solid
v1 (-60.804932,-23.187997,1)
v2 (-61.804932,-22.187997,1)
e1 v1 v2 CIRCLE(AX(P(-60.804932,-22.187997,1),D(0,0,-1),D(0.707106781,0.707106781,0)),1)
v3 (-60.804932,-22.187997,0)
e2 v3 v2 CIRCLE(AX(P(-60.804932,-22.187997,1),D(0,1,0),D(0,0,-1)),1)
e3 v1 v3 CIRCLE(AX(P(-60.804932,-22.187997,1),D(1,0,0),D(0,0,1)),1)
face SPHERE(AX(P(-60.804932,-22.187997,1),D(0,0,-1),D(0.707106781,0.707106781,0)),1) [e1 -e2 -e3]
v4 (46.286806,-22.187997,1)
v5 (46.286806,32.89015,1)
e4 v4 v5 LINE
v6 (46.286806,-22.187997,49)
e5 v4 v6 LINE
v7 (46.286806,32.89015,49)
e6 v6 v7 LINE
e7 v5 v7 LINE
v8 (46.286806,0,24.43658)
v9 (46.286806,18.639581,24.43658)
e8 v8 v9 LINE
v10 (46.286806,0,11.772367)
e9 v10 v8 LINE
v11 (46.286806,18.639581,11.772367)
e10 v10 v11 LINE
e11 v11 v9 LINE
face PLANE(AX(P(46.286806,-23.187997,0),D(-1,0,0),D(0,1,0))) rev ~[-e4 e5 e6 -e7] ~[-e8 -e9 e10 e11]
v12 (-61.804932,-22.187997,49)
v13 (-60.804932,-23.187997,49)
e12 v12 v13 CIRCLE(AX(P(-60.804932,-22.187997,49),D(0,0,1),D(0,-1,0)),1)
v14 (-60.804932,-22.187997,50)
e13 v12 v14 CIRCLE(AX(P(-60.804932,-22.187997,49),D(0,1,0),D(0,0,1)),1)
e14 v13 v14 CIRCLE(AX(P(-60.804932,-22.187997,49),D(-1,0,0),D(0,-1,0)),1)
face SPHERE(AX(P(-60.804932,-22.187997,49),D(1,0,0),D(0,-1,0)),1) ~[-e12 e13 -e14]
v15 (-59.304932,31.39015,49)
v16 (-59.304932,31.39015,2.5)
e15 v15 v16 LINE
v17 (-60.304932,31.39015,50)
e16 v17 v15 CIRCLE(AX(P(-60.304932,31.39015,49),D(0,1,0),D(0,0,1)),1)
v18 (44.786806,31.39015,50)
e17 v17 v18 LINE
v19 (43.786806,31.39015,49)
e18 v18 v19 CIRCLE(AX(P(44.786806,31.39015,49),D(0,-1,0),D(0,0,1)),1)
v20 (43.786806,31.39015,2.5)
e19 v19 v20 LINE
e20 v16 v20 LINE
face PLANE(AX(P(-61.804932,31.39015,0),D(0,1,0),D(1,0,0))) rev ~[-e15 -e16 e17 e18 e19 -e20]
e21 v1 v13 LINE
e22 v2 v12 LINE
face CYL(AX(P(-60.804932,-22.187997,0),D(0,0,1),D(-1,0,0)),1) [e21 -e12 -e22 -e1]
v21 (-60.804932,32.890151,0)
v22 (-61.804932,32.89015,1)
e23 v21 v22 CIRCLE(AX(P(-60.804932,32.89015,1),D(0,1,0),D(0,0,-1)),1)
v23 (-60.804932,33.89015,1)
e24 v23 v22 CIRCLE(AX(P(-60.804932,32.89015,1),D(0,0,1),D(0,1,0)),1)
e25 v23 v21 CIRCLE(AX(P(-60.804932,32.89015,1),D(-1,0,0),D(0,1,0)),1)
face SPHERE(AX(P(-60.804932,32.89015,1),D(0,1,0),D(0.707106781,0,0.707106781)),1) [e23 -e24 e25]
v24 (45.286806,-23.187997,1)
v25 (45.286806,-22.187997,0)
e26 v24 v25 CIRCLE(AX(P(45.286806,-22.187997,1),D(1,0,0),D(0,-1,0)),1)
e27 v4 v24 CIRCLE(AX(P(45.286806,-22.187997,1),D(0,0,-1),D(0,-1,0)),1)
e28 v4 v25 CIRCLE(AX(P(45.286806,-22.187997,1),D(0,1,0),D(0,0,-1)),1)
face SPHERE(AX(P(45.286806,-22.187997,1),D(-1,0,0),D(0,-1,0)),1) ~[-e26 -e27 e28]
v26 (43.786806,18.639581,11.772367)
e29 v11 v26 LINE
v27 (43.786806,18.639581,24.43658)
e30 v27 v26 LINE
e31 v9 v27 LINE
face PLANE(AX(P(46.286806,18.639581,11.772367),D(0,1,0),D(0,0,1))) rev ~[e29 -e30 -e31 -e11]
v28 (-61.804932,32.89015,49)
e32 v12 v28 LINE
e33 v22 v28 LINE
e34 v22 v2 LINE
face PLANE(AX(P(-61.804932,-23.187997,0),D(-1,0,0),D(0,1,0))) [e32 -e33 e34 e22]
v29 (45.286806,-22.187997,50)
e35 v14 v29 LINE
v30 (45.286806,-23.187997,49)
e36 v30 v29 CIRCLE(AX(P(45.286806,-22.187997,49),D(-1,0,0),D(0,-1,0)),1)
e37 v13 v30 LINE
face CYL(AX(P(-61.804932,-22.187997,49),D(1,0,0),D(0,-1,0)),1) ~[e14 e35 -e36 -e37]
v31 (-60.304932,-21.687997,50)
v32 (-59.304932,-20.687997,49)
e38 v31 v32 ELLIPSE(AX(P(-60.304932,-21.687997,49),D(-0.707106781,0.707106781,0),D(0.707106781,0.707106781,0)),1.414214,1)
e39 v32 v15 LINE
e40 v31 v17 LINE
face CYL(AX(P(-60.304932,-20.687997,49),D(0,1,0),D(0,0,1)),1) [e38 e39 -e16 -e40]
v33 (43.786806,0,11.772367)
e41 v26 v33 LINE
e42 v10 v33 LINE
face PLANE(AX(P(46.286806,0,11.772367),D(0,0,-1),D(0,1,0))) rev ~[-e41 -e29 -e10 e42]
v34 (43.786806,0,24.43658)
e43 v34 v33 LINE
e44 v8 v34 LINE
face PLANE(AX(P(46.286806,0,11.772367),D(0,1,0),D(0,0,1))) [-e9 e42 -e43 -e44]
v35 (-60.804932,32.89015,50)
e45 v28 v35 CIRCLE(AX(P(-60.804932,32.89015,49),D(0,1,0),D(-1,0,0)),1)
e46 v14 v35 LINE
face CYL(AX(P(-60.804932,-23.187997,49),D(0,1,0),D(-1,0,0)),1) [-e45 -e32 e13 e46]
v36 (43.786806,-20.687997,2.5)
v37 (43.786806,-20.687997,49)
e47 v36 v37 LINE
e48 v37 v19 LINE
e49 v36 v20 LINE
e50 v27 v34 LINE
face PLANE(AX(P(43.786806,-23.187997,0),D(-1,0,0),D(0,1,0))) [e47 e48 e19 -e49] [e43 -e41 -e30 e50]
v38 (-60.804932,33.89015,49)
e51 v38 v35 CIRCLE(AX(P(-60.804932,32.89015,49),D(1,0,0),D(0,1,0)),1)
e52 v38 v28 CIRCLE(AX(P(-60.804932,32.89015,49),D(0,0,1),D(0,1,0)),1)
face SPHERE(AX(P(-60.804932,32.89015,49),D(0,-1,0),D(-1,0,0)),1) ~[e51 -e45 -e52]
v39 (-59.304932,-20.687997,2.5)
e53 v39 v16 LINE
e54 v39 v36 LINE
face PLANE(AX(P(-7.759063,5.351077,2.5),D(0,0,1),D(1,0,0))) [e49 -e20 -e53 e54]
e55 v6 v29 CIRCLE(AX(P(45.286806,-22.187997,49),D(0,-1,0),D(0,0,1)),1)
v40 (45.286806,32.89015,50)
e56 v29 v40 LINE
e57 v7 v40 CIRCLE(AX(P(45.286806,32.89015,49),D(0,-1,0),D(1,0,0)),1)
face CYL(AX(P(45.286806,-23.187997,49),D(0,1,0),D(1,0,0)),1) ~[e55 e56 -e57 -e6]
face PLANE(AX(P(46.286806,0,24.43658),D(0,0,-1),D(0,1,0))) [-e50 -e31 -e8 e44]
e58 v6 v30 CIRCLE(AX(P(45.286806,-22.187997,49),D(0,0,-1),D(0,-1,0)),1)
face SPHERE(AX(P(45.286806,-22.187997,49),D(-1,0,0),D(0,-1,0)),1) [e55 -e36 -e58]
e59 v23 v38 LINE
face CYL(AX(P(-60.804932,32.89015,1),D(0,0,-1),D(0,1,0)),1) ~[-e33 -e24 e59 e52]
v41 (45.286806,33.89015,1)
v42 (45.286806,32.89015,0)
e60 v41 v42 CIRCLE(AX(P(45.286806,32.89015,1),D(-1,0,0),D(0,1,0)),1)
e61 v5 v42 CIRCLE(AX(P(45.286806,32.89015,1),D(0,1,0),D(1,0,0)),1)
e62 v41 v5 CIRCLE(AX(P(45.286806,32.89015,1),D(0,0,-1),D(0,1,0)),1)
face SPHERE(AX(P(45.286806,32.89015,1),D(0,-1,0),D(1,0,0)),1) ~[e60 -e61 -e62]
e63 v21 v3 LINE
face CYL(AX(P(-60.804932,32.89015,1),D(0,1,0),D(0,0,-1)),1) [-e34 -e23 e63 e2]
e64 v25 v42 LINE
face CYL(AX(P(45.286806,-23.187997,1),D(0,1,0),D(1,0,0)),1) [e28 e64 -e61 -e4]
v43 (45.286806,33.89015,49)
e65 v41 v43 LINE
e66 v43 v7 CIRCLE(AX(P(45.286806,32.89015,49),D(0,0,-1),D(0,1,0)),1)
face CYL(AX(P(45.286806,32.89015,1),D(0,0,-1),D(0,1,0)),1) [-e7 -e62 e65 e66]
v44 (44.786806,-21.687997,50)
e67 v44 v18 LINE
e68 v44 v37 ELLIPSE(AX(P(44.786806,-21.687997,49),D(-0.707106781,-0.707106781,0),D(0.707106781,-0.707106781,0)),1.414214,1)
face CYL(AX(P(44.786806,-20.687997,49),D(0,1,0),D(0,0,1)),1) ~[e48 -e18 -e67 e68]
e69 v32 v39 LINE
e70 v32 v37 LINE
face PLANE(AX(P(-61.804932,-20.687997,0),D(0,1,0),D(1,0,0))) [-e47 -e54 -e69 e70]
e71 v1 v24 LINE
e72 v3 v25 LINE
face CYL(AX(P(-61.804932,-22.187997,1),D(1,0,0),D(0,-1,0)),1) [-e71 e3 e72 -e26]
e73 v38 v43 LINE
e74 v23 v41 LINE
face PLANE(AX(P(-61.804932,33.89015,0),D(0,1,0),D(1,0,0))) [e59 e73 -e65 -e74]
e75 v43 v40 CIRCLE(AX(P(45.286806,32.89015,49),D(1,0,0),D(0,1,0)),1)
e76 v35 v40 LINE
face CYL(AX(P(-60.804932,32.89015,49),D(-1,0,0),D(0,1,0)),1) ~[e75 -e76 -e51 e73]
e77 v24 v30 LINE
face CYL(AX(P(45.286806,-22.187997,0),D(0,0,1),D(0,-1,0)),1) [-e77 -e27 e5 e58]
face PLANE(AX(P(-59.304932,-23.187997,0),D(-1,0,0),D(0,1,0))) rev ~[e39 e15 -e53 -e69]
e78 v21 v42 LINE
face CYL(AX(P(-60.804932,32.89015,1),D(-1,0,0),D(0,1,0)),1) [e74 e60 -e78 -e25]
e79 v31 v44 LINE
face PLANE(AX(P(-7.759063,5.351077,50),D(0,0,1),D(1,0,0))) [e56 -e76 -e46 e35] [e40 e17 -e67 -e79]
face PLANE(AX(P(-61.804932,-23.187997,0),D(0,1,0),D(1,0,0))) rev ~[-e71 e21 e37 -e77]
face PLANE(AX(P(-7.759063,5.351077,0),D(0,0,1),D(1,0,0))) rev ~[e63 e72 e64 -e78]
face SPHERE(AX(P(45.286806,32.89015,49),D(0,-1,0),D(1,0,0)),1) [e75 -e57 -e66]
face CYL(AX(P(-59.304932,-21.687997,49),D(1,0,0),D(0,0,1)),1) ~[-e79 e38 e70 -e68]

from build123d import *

# Parameters (mm, degrees)
F0_W         = 108.091738075
F0_H         = 57.078147307
F1_DEPTH     = 50
F2_T         = -2.5
F3_R         = 1
F4_T1_DEPTH  = 48
F4_T3_DEPTH  = 106.091738075
F4_T5_DEPTH  = 55.078147307
F4_S9_W      = 1
F4_S9_H      = 1
F4_T10_DEPTH = 1
F4_S15_W     = 1
F4_S15_H     = 1
F4_T16_DEPTH = 1
F4_T20_ANGLE = 90
F4_T22_ANGLE = 90
F4_T24_ANGLE = 90
F5_W         = 18.639581278
F5_H         = 12.6642128453
F6_DEPTH     = 25


# Not quite as in the source:
# - a fillet or chamfer that OpenCascade refuses, or shapes differently, is made with other operations: its cross-section is extruded or revolved along the edge and cut away or added


with BuildPart() as f1:
    # F0 (on Top) → F1 (new body)
    with BuildSketch(Plane.XY):
        with Locations((-7.7590625733, 5.3510768339)):
            Rectangle(F0_W, F0_H)
    extrude(amount=F1_DEPTH)

    # F2
    f2_openings = [f1.faces().sort_by_distance(p)[0] for p in [
        (-7.759063, 5.351077, 50),
    ]]
    offset(amount=F2_T, openings=f2_openings)

    # F3
    f3_edges = [f1.edges().sort_by_distance(p)[0] for p in [
        (-7.759063, -23.187997, 50),
        (-61.804932, -23.187997, 25),
        (-7.759063, -20.687997, 50),
        (-59.304932, 5.351077, 50),
        (-61.804932, 5.351077, 50),
        (-7.759063, -23.187997, 0),
        (46.286806, -23.187997, 25),
        (43.786806, 5.351077, 50),
        (46.286806, 5.351077, 50),
        (46.286806, 5.351077, 0),
    ]]
    fillet(f3_edges, radius=F3_R)

    # F4: fillet of radius 1 on 3 edges, made by hand

    # F4_s2 → F4_t1 (cut)
    with BuildSketch(Plane.XY.offset(1)):
        with BuildLine():
            ThreePointArc((45.2868064642, 33.8901504874), (45.9939132454, 33.5972572686), (46.2868064642, 32.8901504874))
            Line((46.2868064642, 32.8901504874), (46.2868064642, 33.8901504874))
            Line((46.2868064642, 33.8901504874), (45.2868064642, 33.8901504874))
        make_face()
        with BuildLine():
            ThreePointArc((-60.8049316108, 33.8901504874), (-61.512038392, 33.5972572686), (-61.8049316108, 32.8901504874))
            Line((-61.8049316108, 32.8901504874), (-61.8049316108, 33.8901504874))
            Line((-61.8049316108, 33.8901504874), (-60.8049316108, 33.8901504874))
        make_face()
    extrude(amount=F4_T1_DEPTH, mode=Mode.SUBTRACT)

    # F4_s4 → F4_t3 (cut)
    with BuildSketch(Plane.YZ.offset(-60.8049316108)):
        with BuildLine():
            ThreePointArc((33.8901504874, 49), (33.5972572686, 49.7071067812), (32.8901504874, 50))
            Line((32.8901504874, 50), (33.8901504874, 50))
            Line((33.8901504874, 50), (33.8901504874, 49))
        make_face()
        with BuildLine():
            ThreePointArc((33.8901504874, 1), (33.5972572686, 0.2928932188), (32.8901504874, 0))
            Line((32.8901504874, 0), (33.8901504874, 0))
            Line((33.8901504874, 0), (33.8901504874, 1))
        make_face()
    extrude(amount=F4_T3_DEPTH, mode=Mode.SUBTRACT)

    # F4_s6 → F4_t5 (cut)
    with BuildSketch(Plane.XZ.offset(-32.8901504874)):
        with BuildLine():
            ThreePointArc((-60.8049316108, 0), (-61.512038392, 0.2928932188), (-61.8049316108, 1))
            Line((-61.8049316108, 1), (-61.8049316108, 0))
            Line((-61.8049316108, 0), (-60.8049316108, 0))
        make_face()
    extrude(amount=F4_T5_DEPTH, mode=Mode.SUBTRACT)


with BuildPart() as f4_tool8:
    # F4_s9 → F4_t10 (new body)
    with BuildSketch(Plane.XY.offset(1)):
        with Locations((-61.3049316108, -22.6879968196)):
            Rectangle(F4_S9_W, F4_S9_H)
    extrude(amount=-F4_T10_DEPTH)

    # F4_s11 → F4_t12 (revolve, cut)
    with BuildSketch(Plane(origin=(-60.8049316108, -22.1879968196, 1), x_dir=(0.7071067812, 0.7071067812, 0), z_dir=(-0.7071067812, 0.7071067812, 0))):
        with BuildLine():
            ThreePointArc((0, -1), (1, 0), (0, 1))
            Line((0, 1), (0, -1))
        make_face()
    revolve(axis=Axis((-60.8049316108, -22.1879968196, 1), (0, 0, -1)), mode=Mode.SUBTRACT)


with BuildPart() as f1_1:
    add(f1.part)

    # F4_t7: cut F4_tool8
    add(f4_tool8.part, mode=Mode.SUBTRACT)


with BuildPart() as f4_tool14:
    # F4_s15 → F4_t16 (new body)
    with BuildSketch(Plane.XZ.offset(-32.8901504874)):
        with Locations((-61.3049316108, 0.5)):
            Rectangle(F4_S15_W, F4_S15_H)
    extrude(amount=-F4_T16_DEPTH)

    # F4_s17 → F4_t18 (revolve, cut)
    with BuildSketch(Plane(origin=(-60.8049316108, 32.8901504874, 1), x_dir=(0.7071067812, 0, 0.7071067812), z_dir=(-0.7071067812, 0, 0.7071067812))):
        with BuildLine():
            ThreePointArc((0, -1), (1, 0), (0, 1))
            Line((0, 1), (0, -1))
        make_face()
    revolve(axis=Axis((-60.8049316108, 32.8901504874, 1), (0, 1, 0)), mode=Mode.SUBTRACT)


with BuildPart() as f1_2:
    add(f1_1.part)

    # F4_t13: cut F4_tool14
    add(f4_tool14.part, mode=Mode.SUBTRACT)

    # F4_s19 → F4_t20 (revolve, cut)
    with BuildSketch(Plane.XY.offset(49)):
        with BuildLine():
            ThreePointArc((45.2868064642, 33.8901504874), (45.9939132454, 33.5972572686), (46.2868064642, 32.8901504874))
            Line((46.2868064642, 32.8901504874), (46.2868064642, 33.8901504874))
            Line((46.2868064642, 33.8901504874), (45.2868064642, 33.8901504874))
        make_face()
    revolve(axis=Axis((45.2868064642, 33.8901504874, 49), (0, -1, 0)), revolution_arc=F4_T20_ANGLE, mode=Mode.SUBTRACT)

    # F4_s21 → F4_t22 (revolve, cut)
    with BuildSketch(Plane.XY.offset(49)):
        with BuildLine():
            ThreePointArc((-60.8049316108, 33.8901504874), (-61.512038392, 33.5972572686), (-61.8049316108, 32.8901504874))
            Line((-61.8049316108, 32.8901504874), (-61.8049316108, 33.8901504874))
            Line((-61.8049316108, 33.8901504874), (-60.8049316108, 33.8901504874))
        make_face()
    revolve(axis=Axis((-60.8049316108, 33.8901504874, 49), (0, 1, 0)), revolution_arc=F4_T22_ANGLE, mode=Mode.SUBTRACT)

    # F4_s23 → F4_t24 (revolve, cut)
    with BuildSketch(Plane.XY.offset(1)):
        with BuildLine():
            ThreePointArc((45.2868064642, 33.8901504874), (45.9939132454, 33.5972572686), (46.2868064642, 32.8901504874))
            Line((46.2868064642, 32.8901504874), (46.2868064642, 33.8901504874))
            Line((46.2868064642, 33.8901504874), (45.2868064642, 33.8901504874))
        make_face()
    revolve(axis=Axis((45.2868064642, 33.8901504874, 1), (0, 1, 0)), revolution_arc=F4_T24_ANGLE, mode=Mode.SUBTRACT)

    # F5 (on face) → F6 (cut)
    with BuildSketch(Plane.YZ.offset(46.2868064642)):
        with Locations((9.319790639, 18.1044735946)):
            Rectangle(F5_W, F5_H)
    extrude(amount=-F6_DEPTH, mode=Mode.SUBTRACT)


solid = f1_2.part
